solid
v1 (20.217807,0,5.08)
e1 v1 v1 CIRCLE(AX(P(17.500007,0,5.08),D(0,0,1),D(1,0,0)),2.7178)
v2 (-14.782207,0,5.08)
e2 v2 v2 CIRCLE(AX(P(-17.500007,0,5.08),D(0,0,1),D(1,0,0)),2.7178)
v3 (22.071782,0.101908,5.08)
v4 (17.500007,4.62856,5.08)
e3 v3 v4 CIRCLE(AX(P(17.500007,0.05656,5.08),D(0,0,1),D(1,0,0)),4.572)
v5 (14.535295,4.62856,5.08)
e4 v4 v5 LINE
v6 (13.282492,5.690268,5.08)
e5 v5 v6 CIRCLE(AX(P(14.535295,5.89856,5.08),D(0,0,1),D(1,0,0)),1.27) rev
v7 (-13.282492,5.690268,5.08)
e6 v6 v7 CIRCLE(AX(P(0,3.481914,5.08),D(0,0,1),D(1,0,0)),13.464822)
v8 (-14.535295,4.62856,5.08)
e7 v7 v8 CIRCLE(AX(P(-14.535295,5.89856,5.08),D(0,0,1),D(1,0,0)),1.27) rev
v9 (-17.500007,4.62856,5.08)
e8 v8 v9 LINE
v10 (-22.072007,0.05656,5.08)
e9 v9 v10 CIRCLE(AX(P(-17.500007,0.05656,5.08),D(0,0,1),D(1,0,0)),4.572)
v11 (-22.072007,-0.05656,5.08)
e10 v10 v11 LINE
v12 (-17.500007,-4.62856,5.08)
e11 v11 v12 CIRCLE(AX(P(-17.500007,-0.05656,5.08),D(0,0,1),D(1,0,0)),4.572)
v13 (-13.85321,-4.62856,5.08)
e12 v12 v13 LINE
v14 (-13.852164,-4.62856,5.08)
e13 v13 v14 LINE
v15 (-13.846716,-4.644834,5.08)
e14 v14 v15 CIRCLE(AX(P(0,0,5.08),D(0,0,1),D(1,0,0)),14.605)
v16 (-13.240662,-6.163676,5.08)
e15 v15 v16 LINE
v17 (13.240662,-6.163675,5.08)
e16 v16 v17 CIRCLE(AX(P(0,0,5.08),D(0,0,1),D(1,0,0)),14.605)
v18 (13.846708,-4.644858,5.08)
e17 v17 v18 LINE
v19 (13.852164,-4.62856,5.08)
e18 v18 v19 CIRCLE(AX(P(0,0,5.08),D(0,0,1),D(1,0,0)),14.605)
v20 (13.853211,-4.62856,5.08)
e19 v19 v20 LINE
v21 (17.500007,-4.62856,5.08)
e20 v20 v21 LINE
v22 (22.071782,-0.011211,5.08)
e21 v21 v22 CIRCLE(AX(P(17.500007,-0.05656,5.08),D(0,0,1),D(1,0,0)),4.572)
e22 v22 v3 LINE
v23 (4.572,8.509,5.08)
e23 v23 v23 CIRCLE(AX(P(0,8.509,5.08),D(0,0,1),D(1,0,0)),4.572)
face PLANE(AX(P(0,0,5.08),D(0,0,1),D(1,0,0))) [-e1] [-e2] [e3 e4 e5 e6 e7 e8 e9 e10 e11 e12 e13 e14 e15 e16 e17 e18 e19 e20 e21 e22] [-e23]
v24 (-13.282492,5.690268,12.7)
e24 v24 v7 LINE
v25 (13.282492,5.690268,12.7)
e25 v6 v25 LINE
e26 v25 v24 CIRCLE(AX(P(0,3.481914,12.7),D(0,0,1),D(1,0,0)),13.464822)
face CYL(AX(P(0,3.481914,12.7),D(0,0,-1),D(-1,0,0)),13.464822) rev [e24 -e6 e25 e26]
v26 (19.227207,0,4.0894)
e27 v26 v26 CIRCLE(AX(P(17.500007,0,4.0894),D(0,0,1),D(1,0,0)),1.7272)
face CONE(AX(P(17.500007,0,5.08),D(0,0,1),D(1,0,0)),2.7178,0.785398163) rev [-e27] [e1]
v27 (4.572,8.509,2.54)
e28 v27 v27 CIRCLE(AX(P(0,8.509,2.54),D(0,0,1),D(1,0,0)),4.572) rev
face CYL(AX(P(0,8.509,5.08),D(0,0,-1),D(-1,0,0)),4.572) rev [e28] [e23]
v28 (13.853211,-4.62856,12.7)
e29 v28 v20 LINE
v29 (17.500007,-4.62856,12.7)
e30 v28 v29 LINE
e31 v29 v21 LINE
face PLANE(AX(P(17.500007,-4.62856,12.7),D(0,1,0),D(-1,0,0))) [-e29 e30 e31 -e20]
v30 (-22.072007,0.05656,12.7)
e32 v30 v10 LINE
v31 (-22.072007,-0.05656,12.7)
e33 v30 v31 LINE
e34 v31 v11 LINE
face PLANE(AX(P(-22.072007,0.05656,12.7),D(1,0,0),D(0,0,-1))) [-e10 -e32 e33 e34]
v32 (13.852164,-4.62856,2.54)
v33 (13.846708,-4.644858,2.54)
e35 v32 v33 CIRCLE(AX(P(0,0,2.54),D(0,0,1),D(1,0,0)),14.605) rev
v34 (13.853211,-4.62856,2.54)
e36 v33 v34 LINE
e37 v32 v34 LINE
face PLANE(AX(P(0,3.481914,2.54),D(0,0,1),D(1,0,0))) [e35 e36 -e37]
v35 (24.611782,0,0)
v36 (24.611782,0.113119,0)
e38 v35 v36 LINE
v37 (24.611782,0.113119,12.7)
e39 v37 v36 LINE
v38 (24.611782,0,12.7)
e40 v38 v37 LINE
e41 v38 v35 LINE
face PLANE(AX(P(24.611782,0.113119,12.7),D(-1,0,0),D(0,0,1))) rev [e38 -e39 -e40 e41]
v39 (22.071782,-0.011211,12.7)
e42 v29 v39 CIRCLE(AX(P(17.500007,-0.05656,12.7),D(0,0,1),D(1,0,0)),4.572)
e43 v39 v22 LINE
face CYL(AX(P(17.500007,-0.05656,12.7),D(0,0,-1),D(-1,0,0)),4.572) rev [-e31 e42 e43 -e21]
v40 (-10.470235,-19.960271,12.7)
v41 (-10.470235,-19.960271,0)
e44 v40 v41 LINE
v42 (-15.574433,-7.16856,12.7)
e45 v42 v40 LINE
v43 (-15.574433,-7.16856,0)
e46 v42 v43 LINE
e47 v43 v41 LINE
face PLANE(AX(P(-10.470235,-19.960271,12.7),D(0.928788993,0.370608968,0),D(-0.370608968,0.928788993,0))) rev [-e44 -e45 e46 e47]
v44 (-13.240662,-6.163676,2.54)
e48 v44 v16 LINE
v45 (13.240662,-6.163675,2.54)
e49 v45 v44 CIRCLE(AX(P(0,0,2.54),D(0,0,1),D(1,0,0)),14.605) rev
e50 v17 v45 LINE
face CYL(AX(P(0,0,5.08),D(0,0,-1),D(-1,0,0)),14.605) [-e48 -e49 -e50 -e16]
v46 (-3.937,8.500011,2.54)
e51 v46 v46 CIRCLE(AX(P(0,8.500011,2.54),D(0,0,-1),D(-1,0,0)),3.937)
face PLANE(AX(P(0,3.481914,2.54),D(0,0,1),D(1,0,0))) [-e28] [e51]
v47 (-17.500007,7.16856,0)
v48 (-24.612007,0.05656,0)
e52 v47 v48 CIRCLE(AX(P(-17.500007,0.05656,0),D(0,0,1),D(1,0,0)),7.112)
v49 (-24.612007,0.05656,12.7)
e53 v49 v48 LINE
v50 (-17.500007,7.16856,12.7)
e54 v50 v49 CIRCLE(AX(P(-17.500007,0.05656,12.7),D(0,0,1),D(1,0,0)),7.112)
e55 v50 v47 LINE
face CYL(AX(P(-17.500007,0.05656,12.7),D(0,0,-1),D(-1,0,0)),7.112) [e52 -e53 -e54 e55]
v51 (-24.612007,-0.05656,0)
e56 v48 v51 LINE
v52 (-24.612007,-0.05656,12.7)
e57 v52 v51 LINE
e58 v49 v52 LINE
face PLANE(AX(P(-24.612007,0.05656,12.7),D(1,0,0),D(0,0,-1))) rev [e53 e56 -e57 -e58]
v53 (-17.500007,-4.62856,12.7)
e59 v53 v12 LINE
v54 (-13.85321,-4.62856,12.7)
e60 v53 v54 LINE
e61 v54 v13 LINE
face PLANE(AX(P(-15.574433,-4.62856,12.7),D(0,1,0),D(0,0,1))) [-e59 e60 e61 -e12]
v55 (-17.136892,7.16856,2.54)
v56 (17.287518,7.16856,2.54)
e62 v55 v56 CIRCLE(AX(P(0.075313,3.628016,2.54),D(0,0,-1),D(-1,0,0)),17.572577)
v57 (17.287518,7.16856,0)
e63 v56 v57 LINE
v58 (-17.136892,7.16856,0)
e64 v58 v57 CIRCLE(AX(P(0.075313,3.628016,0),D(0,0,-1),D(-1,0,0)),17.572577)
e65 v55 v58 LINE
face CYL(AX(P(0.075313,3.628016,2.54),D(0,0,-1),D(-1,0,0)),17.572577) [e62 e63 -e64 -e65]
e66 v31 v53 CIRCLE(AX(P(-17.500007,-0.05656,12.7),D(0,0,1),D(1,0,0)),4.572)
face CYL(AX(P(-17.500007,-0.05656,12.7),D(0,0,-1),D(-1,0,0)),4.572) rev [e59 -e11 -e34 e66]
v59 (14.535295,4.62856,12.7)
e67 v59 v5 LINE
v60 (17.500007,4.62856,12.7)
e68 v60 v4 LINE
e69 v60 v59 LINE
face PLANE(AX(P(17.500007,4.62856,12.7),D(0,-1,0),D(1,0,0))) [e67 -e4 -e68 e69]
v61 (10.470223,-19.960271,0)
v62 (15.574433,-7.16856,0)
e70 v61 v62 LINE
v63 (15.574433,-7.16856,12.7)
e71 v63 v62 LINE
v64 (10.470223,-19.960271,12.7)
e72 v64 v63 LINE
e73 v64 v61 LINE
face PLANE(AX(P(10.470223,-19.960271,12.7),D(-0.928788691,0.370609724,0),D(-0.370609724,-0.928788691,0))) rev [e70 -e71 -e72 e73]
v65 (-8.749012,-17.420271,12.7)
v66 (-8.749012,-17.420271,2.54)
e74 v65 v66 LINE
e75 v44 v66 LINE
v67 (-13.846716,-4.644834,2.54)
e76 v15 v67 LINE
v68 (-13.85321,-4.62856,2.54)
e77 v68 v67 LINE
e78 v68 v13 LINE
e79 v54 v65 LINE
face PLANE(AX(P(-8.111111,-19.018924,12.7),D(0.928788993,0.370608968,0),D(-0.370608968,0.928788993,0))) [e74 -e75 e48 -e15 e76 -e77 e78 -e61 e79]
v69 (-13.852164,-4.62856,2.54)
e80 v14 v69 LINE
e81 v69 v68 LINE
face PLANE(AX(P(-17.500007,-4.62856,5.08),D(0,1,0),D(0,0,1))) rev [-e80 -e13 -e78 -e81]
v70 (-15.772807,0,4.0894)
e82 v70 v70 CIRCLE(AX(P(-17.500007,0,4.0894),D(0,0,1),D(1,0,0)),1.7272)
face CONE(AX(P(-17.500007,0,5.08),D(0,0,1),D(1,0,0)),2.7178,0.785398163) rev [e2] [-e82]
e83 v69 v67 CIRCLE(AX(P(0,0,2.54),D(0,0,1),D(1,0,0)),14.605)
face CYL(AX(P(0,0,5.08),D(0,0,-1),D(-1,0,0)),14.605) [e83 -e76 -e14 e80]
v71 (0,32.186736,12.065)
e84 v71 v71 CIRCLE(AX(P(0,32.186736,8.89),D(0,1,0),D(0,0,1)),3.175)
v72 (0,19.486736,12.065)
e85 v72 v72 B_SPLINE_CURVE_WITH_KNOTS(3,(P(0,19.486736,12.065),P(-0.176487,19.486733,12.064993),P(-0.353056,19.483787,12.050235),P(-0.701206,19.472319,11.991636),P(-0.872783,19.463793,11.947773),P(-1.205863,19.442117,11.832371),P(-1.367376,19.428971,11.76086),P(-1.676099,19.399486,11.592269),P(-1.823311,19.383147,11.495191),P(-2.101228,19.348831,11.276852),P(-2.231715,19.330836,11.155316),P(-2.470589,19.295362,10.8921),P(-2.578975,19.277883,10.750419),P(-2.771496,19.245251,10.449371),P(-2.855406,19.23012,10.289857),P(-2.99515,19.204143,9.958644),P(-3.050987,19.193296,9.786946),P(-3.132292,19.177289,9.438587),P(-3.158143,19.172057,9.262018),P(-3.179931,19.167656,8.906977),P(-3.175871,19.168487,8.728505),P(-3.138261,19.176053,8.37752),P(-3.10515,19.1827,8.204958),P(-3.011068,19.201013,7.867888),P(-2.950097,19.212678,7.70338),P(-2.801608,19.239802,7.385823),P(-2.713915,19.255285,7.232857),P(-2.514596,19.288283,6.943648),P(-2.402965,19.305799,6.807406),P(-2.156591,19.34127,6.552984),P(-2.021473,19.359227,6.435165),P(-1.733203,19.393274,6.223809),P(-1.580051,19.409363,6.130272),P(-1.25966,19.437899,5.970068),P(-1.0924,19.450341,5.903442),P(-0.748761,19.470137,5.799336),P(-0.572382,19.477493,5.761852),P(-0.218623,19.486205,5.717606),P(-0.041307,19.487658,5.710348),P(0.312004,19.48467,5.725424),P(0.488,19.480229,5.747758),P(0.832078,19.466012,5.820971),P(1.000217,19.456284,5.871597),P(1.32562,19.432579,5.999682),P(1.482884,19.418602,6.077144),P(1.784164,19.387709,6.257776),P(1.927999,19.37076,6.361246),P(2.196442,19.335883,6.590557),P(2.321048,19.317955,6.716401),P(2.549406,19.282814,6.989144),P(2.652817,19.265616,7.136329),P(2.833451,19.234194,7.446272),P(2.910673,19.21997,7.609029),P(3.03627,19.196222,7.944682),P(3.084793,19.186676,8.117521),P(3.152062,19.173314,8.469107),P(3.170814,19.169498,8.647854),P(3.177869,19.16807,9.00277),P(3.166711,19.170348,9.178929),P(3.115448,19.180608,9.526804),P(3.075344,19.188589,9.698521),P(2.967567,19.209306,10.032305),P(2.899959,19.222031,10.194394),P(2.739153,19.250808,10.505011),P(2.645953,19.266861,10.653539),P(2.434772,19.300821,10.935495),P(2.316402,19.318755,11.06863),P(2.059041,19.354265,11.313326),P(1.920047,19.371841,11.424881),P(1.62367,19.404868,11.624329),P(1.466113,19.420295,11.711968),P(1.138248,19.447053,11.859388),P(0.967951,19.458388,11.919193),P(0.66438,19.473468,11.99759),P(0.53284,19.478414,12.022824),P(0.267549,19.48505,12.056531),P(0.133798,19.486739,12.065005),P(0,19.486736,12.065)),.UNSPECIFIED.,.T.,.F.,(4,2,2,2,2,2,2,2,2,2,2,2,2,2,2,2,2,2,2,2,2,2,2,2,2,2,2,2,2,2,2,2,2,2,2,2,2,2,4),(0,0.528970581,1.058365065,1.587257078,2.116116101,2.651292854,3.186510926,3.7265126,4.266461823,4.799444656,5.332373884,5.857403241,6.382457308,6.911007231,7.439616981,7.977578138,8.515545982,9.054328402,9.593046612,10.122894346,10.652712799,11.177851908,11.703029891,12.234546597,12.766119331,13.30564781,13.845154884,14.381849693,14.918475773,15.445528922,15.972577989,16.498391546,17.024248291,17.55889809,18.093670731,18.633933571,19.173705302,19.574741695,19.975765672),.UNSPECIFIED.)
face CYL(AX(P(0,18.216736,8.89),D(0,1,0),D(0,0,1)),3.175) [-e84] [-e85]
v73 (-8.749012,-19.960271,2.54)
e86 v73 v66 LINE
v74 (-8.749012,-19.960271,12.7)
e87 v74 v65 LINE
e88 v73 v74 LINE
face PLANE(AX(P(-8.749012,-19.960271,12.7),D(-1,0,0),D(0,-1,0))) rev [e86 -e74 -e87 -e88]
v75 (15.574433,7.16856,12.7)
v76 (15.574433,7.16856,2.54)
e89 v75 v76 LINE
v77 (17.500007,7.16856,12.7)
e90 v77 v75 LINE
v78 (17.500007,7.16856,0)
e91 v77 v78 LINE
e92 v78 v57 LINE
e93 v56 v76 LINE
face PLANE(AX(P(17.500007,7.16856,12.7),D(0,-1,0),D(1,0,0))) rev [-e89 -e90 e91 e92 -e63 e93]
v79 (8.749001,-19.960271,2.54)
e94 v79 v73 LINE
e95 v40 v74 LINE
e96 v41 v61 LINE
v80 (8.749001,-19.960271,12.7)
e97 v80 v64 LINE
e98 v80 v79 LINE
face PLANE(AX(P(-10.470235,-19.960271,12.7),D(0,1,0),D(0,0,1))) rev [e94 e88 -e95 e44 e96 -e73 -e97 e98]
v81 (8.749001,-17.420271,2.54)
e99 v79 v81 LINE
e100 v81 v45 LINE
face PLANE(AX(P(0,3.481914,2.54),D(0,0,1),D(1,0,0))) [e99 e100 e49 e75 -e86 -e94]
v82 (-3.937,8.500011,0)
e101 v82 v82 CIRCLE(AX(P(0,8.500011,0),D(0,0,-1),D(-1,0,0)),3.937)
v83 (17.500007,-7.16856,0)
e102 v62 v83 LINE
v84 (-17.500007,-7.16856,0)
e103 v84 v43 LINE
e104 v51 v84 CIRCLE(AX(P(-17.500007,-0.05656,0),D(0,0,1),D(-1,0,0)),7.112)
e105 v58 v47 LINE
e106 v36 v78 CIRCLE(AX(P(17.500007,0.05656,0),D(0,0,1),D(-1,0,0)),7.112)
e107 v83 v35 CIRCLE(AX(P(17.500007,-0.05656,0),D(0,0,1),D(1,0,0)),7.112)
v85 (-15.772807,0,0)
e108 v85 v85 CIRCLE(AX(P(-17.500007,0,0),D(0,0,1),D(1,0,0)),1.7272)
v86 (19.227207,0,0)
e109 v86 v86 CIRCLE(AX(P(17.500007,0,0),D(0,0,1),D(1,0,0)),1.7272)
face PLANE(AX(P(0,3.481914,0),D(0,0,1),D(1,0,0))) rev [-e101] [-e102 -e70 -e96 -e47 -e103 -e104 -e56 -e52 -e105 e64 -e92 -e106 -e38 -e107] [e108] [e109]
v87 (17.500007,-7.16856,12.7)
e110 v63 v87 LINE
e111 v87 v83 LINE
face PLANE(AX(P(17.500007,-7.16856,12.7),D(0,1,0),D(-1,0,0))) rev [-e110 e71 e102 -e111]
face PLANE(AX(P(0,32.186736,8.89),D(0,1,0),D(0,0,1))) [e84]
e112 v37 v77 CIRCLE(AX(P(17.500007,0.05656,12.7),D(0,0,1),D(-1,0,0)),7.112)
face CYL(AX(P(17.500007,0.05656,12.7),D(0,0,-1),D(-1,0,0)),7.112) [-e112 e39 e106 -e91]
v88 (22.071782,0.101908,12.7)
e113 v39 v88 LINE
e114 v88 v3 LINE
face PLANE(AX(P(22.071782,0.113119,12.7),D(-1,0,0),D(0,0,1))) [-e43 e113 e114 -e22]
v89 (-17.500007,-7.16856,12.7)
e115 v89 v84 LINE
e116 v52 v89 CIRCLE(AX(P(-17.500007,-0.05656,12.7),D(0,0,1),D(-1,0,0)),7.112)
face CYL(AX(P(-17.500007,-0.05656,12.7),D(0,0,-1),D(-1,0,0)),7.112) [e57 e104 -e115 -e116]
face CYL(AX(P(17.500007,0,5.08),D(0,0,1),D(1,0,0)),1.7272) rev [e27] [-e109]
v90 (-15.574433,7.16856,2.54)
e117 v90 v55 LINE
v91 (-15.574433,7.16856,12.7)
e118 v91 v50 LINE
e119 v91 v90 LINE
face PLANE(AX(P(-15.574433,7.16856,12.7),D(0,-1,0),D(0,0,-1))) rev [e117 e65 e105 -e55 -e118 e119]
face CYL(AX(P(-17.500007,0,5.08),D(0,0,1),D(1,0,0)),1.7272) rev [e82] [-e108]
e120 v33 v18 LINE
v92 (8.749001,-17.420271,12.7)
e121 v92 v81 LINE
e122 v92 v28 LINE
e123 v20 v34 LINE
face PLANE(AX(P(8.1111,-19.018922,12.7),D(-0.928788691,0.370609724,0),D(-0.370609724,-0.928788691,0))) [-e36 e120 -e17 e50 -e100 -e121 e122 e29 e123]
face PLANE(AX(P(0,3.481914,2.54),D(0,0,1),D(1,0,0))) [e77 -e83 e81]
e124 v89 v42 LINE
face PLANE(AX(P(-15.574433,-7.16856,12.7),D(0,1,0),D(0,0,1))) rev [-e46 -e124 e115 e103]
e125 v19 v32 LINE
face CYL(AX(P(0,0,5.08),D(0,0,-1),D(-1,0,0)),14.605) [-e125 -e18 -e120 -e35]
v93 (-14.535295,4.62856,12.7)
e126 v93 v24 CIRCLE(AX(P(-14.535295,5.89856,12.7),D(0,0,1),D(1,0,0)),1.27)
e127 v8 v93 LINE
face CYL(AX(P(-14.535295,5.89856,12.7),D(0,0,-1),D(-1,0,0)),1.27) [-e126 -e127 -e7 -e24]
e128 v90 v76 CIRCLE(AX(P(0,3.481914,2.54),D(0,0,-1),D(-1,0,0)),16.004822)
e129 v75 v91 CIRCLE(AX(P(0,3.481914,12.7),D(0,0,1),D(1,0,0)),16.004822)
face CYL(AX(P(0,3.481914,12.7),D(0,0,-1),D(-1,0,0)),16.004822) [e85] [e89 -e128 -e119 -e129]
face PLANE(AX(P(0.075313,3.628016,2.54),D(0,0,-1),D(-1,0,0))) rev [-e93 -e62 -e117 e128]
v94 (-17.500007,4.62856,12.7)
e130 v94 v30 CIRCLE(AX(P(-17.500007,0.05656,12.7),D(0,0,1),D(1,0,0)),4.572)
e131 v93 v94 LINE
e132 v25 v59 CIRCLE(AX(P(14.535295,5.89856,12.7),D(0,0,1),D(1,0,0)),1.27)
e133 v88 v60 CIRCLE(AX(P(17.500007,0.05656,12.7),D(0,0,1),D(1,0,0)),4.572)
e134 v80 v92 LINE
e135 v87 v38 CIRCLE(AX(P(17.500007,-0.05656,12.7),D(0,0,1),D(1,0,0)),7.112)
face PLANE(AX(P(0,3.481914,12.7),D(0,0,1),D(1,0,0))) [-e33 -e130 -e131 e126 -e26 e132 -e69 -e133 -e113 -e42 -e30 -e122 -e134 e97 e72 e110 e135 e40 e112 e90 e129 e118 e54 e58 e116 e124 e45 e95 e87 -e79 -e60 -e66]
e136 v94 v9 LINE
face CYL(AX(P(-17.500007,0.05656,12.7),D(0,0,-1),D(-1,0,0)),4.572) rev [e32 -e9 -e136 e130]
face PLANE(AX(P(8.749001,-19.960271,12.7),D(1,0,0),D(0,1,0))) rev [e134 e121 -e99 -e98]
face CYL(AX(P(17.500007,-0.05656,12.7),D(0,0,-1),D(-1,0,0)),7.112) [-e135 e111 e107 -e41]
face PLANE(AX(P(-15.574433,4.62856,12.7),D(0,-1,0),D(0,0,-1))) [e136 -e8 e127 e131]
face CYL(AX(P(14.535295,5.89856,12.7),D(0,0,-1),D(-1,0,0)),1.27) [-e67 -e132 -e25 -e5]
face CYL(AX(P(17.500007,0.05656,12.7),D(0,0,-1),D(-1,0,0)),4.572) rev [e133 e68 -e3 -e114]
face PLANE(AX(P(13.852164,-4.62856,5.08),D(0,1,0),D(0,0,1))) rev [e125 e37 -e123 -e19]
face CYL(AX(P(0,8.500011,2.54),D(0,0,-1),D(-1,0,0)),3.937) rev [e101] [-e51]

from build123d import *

# Parameters (mm, degrees)
BOSS_EXTRUDE1_DEPTH             = 12.7
SHELL1_START                    = 2.54
SHELL1_DEPTH                    = 10.16
BOSS_EXTRUDE7_DEPTH             = 2.54
SKETCH7_W                       = 17.498012995
SKETCH7_H                       = 10.16
CUT_EXTRUDE5_DEPTH              = 48.524856948
SKETCH13_R                      = 4.572
BOSS_EXTRUDE3_DEPTH             = 2.54
CUT_EXTRUDE7_DEPTH              = 34.365857316
CUT_EXTRUDE7_DEPTH_BACK         = 34.365857316
SKETCH14_R                      = 2.667
F_8_32_TAPPED_HOLE1_D           = 3.4544
F_8_32_TAPPED_HOLE1_CSINK_D     = 5.4356
F_8_32_TAPPED_HOLE1_CSINK_ANGLE = 90
BOSS_EXTRUDE4_DEPTH             = 12.7
BOSS_EXTRUDE4_DEPTH_BACK        = 1.27
SKETCH18_R                      = 3.175
SKETCH19_R                      = 3.937
CUT_EXTRUDE8_DEPTH              = 2.54
FILLET1_R                       = 1.27


# Read off the part's stored shape, not the designer's step: Shell1
with BuildPart() as part:
    # Sketch1 → Boss-Extrude1 (new body)
    with BuildSketch(Plane.XY):
        with BuildLine():
            Line((17.500007037, 7.168559726), (15.574433037, 7.168559726))
            ThreePointArc((15.574433037, 7.168559726), (0, 19.486736174), (-15.574433037, 7.168559726))
            Line((-15.574433037, 7.168559726), (-17.500007037, 7.168559726))
            ThreePointArc((-17.500007037, 7.168559726), (-22.528950465, 5.085503154), (-24.612007037, 0.056559726))
            Line((-24.612007037, 0.056559726), (-24.612007037, -0.056559726))
            ThreePointArc((-24.612007037, -0.056559726), (-22.528950465, -5.085503154), (-17.500007037, -7.168559726))
            Line((-17.500007037, -7.168559726), (-15.574433037, -7.168559726))
            Line((-15.574433037, -7.168559726), (-10.470235042, -19.960271007))
            Line((-10.470235042, -19.960271007), (10.470222973, -19.960271007))
            Line((10.470222973, -19.960271007), (15.574433037, -7.168559726))
            Line((15.574433037, -7.168559726), (17.500007037, -7.168559726))
            ThreePointArc((17.500007037, -7.168559726), (22.548907748, -5.065466355), (24.611782132, 0))
            Line((24.611782132, 0), (24.611782132, 0.113119452))
            ThreePointArc((24.611782132, 0.113119452), (22.508913666, 5.105460437), (17.500007037, 7.168559726))
        make_face()
    extrude(amount=BOSS_EXTRUDE1_DEPTH)

    # Shell1 outline → Shell1 (cut)
    with BuildSketch(Plane.XY.offset(SHELL1_START)):
        with BuildLine():
            ThreePointArc((13.415909513, 4.628559726), (0, 16.946736174), (-13.415909513, 4.628559726))
            Line((-13.415909513, 4.628559726), (-17.500007037, 4.628559726))
            ThreePointArc((-17.500007037, 4.628559726), (-20.732899241, 3.28945193), (-22.072007037, 0.056559726))
            Line((-22.072007037, 0.056559726), (-22.072007037, -0.056559726))
            ThreePointArc((-22.072007037, -0.056559726), (-20.732899241, -3.28945193), (-17.500007037, -4.628559726))
            Line((-17.500007037, -4.628559726), (-13.853209773, -4.628559726))
            Line((-13.853209773, -4.628559726), (-8.749011778, -17.420271007))
            Line((-8.749011778, -17.420271007), (8.749001217, -17.420271007))
            Line((8.749001217, -17.420271007), (13.853211281, -4.628559726))
            Line((13.853211281, -4.628559726), (17.500007037, -4.628559726))
            ThreePointArc((17.500007037, -4.628559726), (20.748892784, -3.273378869), (22.071782132, -0.011211257))
            Line((22.071782132, -0.011211257), (22.071782132, 0.101908195))
            ThreePointArc((22.071782132, 0.101908195), (20.71682618, 3.305445473), (17.500007037, 4.628559726))
            Line((17.500007037, 4.628559726), (13.415909513, 4.628559726))
        make_face()
    extrude(amount=SHELL1_DEPTH, mode=Mode.SUBTRACT)

    # Sketch22 → Boss-Extrude7 (add)
    with BuildSketch(Plane(origin=(0, 0, 0), x_dir=(-1, 0, 0), z_dir=(0, 0, -1))):
        with BuildLine():
            Line((-17.28751812, 7.168559726), (17.136892248, 7.168559726))
            ThreePointArc((17.136892248, 7.168559726), (-0.075312936, 21.200593012), (-17.28751812, 7.168559726))
        make_face()
    extrude(amount=-BOSS_EXTRUDE7_DEPTH)

    # Sketch7 → Cut-Extrude5 (cut, through all)
    with BuildSketch(Plane(origin=(0, -17.420271007, 0), x_dir=(1, 0, 0), z_dir=(0, 1, 0))):
        with Locations((-5.28e-06, -7.62)):
            Rectangle(SKETCH7_W, SKETCH7_H)
    extrude(amount=-CUT_EXTRUDE5_DEPTH, mode=Mode.SUBTRACT)

    # Sketch13 → Boss-Extrude3 (add)
    with BuildSketch(Plane.XY.offset(2.54)):
        with BuildLine():
            Line((-17.500007037, -4.628559726), (-13.852164447, -4.628559726))
            ThreePointArc((-13.852164447, -4.628559726), (0, -14.605), (13.852164447, -4.628559726))
            Line((13.852164447, -4.628559726), (16.51, -4.628559726))
            ThreePointArc((16.51, -4.628559726), (21.991424378, -1.364408419), (19.119271672, 4.332207752))
            ThreePointArc((19.119271672, 4.332207752), (18.323086992, 4.553861516), (17.500007037, 4.628559726))
            Line((17.500007037, 4.628559726), (13.415909513, 4.628559726))
            ThreePointArc((13.415909513, 4.628559726), (0, 16.946736174), (-13.415909513, 4.628559726))
            Line((-13.415909513, 4.628559726), (-16.51, 4.628559726))
            ThreePointArc((-16.51, 4.628559726), (-21.991424378, 1.364408419), (-19.119271672, -4.332207752))
            ThreePointArc((-19.119271672, -4.332207752), (-18.323086992, -4.553861516), (-17.500007037, -4.628559726))
        make_face()
        with Locations((0, 8.509)):
            Circle(SKETCH13_R, mode=Mode.SUBTRACT)
    extrude(amount=BOSS_EXTRUDE3_DEPTH)

    # Sketch14 → Cut-Extrude7 (cut, two sides: drawn at the far end of the back side and taken through both)
    with BuildSketch(Plane.XY.offset(5.08).offset(-CUT_EXTRUDE7_DEPTH_BACK)):
        with Locations((0, 8.50001094)):
            Circle(SKETCH14_R)
    extrude(amount=CUT_EXTRUDE7_DEPTH + CUT_EXTRUDE7_DEPTH_BACK, mode=Mode.SUBTRACT)

    # #8-32 Tapped Hole1 (through all)
    with Locations(Plane.XY.offset(5.08)):
        with Locations((-17.500007037, 0), (17.500007037, 0)):
            CounterSinkHole(F_8_32_TAPPED_HOLE1_D / 2, F_8_32_TAPPED_HOLE1_CSINK_D / 2, counter_sink_angle=F_8_32_TAPPED_HOLE1_CSINK_ANGLE)

    # Sketch18 → Boss-Extrude4 (add, two sides: drawn at the far end of the back side and taken through both)
    with BuildSketch(Plane(origin=(0, 19.486736174, 0), x_dir=(1, 0, 0), z_dir=(0, 1, 0)).offset(-BOSS_EXTRUDE4_DEPTH_BACK)):
        with Locations(Location((0, -8.89, 0), (0, 0, 270))):
            Circle(SKETCH18_R)
    extrude(amount=BOSS_EXTRUDE4_DEPTH + BOSS_EXTRUDE4_DEPTH_BACK)

    # Sketch19 → Cut-Extrude8 (cut)
    with BuildSketch(Plane(origin=(0, 0, 0), x_dir=(-1, 0, 0), z_dir=(0, 0, -1))):
        with Locations((0, 8.50001094)):
            Circle(SKETCH19_R)
    extrude(amount=-CUT_EXTRUDE8_DEPTH, mode=Mode.SUBTRACT)

    # Fillet1
    fillet1_edges = [part.edges().sort_by_distance(p)[0] for p in [
        (13.415909513, 4.628559726, 8.89),
        (-13.415909513, 4.628559726, 8.89),
    ]]
    fillet(fillet1_edges, radius=FILLET1_R)


solid = part.part
